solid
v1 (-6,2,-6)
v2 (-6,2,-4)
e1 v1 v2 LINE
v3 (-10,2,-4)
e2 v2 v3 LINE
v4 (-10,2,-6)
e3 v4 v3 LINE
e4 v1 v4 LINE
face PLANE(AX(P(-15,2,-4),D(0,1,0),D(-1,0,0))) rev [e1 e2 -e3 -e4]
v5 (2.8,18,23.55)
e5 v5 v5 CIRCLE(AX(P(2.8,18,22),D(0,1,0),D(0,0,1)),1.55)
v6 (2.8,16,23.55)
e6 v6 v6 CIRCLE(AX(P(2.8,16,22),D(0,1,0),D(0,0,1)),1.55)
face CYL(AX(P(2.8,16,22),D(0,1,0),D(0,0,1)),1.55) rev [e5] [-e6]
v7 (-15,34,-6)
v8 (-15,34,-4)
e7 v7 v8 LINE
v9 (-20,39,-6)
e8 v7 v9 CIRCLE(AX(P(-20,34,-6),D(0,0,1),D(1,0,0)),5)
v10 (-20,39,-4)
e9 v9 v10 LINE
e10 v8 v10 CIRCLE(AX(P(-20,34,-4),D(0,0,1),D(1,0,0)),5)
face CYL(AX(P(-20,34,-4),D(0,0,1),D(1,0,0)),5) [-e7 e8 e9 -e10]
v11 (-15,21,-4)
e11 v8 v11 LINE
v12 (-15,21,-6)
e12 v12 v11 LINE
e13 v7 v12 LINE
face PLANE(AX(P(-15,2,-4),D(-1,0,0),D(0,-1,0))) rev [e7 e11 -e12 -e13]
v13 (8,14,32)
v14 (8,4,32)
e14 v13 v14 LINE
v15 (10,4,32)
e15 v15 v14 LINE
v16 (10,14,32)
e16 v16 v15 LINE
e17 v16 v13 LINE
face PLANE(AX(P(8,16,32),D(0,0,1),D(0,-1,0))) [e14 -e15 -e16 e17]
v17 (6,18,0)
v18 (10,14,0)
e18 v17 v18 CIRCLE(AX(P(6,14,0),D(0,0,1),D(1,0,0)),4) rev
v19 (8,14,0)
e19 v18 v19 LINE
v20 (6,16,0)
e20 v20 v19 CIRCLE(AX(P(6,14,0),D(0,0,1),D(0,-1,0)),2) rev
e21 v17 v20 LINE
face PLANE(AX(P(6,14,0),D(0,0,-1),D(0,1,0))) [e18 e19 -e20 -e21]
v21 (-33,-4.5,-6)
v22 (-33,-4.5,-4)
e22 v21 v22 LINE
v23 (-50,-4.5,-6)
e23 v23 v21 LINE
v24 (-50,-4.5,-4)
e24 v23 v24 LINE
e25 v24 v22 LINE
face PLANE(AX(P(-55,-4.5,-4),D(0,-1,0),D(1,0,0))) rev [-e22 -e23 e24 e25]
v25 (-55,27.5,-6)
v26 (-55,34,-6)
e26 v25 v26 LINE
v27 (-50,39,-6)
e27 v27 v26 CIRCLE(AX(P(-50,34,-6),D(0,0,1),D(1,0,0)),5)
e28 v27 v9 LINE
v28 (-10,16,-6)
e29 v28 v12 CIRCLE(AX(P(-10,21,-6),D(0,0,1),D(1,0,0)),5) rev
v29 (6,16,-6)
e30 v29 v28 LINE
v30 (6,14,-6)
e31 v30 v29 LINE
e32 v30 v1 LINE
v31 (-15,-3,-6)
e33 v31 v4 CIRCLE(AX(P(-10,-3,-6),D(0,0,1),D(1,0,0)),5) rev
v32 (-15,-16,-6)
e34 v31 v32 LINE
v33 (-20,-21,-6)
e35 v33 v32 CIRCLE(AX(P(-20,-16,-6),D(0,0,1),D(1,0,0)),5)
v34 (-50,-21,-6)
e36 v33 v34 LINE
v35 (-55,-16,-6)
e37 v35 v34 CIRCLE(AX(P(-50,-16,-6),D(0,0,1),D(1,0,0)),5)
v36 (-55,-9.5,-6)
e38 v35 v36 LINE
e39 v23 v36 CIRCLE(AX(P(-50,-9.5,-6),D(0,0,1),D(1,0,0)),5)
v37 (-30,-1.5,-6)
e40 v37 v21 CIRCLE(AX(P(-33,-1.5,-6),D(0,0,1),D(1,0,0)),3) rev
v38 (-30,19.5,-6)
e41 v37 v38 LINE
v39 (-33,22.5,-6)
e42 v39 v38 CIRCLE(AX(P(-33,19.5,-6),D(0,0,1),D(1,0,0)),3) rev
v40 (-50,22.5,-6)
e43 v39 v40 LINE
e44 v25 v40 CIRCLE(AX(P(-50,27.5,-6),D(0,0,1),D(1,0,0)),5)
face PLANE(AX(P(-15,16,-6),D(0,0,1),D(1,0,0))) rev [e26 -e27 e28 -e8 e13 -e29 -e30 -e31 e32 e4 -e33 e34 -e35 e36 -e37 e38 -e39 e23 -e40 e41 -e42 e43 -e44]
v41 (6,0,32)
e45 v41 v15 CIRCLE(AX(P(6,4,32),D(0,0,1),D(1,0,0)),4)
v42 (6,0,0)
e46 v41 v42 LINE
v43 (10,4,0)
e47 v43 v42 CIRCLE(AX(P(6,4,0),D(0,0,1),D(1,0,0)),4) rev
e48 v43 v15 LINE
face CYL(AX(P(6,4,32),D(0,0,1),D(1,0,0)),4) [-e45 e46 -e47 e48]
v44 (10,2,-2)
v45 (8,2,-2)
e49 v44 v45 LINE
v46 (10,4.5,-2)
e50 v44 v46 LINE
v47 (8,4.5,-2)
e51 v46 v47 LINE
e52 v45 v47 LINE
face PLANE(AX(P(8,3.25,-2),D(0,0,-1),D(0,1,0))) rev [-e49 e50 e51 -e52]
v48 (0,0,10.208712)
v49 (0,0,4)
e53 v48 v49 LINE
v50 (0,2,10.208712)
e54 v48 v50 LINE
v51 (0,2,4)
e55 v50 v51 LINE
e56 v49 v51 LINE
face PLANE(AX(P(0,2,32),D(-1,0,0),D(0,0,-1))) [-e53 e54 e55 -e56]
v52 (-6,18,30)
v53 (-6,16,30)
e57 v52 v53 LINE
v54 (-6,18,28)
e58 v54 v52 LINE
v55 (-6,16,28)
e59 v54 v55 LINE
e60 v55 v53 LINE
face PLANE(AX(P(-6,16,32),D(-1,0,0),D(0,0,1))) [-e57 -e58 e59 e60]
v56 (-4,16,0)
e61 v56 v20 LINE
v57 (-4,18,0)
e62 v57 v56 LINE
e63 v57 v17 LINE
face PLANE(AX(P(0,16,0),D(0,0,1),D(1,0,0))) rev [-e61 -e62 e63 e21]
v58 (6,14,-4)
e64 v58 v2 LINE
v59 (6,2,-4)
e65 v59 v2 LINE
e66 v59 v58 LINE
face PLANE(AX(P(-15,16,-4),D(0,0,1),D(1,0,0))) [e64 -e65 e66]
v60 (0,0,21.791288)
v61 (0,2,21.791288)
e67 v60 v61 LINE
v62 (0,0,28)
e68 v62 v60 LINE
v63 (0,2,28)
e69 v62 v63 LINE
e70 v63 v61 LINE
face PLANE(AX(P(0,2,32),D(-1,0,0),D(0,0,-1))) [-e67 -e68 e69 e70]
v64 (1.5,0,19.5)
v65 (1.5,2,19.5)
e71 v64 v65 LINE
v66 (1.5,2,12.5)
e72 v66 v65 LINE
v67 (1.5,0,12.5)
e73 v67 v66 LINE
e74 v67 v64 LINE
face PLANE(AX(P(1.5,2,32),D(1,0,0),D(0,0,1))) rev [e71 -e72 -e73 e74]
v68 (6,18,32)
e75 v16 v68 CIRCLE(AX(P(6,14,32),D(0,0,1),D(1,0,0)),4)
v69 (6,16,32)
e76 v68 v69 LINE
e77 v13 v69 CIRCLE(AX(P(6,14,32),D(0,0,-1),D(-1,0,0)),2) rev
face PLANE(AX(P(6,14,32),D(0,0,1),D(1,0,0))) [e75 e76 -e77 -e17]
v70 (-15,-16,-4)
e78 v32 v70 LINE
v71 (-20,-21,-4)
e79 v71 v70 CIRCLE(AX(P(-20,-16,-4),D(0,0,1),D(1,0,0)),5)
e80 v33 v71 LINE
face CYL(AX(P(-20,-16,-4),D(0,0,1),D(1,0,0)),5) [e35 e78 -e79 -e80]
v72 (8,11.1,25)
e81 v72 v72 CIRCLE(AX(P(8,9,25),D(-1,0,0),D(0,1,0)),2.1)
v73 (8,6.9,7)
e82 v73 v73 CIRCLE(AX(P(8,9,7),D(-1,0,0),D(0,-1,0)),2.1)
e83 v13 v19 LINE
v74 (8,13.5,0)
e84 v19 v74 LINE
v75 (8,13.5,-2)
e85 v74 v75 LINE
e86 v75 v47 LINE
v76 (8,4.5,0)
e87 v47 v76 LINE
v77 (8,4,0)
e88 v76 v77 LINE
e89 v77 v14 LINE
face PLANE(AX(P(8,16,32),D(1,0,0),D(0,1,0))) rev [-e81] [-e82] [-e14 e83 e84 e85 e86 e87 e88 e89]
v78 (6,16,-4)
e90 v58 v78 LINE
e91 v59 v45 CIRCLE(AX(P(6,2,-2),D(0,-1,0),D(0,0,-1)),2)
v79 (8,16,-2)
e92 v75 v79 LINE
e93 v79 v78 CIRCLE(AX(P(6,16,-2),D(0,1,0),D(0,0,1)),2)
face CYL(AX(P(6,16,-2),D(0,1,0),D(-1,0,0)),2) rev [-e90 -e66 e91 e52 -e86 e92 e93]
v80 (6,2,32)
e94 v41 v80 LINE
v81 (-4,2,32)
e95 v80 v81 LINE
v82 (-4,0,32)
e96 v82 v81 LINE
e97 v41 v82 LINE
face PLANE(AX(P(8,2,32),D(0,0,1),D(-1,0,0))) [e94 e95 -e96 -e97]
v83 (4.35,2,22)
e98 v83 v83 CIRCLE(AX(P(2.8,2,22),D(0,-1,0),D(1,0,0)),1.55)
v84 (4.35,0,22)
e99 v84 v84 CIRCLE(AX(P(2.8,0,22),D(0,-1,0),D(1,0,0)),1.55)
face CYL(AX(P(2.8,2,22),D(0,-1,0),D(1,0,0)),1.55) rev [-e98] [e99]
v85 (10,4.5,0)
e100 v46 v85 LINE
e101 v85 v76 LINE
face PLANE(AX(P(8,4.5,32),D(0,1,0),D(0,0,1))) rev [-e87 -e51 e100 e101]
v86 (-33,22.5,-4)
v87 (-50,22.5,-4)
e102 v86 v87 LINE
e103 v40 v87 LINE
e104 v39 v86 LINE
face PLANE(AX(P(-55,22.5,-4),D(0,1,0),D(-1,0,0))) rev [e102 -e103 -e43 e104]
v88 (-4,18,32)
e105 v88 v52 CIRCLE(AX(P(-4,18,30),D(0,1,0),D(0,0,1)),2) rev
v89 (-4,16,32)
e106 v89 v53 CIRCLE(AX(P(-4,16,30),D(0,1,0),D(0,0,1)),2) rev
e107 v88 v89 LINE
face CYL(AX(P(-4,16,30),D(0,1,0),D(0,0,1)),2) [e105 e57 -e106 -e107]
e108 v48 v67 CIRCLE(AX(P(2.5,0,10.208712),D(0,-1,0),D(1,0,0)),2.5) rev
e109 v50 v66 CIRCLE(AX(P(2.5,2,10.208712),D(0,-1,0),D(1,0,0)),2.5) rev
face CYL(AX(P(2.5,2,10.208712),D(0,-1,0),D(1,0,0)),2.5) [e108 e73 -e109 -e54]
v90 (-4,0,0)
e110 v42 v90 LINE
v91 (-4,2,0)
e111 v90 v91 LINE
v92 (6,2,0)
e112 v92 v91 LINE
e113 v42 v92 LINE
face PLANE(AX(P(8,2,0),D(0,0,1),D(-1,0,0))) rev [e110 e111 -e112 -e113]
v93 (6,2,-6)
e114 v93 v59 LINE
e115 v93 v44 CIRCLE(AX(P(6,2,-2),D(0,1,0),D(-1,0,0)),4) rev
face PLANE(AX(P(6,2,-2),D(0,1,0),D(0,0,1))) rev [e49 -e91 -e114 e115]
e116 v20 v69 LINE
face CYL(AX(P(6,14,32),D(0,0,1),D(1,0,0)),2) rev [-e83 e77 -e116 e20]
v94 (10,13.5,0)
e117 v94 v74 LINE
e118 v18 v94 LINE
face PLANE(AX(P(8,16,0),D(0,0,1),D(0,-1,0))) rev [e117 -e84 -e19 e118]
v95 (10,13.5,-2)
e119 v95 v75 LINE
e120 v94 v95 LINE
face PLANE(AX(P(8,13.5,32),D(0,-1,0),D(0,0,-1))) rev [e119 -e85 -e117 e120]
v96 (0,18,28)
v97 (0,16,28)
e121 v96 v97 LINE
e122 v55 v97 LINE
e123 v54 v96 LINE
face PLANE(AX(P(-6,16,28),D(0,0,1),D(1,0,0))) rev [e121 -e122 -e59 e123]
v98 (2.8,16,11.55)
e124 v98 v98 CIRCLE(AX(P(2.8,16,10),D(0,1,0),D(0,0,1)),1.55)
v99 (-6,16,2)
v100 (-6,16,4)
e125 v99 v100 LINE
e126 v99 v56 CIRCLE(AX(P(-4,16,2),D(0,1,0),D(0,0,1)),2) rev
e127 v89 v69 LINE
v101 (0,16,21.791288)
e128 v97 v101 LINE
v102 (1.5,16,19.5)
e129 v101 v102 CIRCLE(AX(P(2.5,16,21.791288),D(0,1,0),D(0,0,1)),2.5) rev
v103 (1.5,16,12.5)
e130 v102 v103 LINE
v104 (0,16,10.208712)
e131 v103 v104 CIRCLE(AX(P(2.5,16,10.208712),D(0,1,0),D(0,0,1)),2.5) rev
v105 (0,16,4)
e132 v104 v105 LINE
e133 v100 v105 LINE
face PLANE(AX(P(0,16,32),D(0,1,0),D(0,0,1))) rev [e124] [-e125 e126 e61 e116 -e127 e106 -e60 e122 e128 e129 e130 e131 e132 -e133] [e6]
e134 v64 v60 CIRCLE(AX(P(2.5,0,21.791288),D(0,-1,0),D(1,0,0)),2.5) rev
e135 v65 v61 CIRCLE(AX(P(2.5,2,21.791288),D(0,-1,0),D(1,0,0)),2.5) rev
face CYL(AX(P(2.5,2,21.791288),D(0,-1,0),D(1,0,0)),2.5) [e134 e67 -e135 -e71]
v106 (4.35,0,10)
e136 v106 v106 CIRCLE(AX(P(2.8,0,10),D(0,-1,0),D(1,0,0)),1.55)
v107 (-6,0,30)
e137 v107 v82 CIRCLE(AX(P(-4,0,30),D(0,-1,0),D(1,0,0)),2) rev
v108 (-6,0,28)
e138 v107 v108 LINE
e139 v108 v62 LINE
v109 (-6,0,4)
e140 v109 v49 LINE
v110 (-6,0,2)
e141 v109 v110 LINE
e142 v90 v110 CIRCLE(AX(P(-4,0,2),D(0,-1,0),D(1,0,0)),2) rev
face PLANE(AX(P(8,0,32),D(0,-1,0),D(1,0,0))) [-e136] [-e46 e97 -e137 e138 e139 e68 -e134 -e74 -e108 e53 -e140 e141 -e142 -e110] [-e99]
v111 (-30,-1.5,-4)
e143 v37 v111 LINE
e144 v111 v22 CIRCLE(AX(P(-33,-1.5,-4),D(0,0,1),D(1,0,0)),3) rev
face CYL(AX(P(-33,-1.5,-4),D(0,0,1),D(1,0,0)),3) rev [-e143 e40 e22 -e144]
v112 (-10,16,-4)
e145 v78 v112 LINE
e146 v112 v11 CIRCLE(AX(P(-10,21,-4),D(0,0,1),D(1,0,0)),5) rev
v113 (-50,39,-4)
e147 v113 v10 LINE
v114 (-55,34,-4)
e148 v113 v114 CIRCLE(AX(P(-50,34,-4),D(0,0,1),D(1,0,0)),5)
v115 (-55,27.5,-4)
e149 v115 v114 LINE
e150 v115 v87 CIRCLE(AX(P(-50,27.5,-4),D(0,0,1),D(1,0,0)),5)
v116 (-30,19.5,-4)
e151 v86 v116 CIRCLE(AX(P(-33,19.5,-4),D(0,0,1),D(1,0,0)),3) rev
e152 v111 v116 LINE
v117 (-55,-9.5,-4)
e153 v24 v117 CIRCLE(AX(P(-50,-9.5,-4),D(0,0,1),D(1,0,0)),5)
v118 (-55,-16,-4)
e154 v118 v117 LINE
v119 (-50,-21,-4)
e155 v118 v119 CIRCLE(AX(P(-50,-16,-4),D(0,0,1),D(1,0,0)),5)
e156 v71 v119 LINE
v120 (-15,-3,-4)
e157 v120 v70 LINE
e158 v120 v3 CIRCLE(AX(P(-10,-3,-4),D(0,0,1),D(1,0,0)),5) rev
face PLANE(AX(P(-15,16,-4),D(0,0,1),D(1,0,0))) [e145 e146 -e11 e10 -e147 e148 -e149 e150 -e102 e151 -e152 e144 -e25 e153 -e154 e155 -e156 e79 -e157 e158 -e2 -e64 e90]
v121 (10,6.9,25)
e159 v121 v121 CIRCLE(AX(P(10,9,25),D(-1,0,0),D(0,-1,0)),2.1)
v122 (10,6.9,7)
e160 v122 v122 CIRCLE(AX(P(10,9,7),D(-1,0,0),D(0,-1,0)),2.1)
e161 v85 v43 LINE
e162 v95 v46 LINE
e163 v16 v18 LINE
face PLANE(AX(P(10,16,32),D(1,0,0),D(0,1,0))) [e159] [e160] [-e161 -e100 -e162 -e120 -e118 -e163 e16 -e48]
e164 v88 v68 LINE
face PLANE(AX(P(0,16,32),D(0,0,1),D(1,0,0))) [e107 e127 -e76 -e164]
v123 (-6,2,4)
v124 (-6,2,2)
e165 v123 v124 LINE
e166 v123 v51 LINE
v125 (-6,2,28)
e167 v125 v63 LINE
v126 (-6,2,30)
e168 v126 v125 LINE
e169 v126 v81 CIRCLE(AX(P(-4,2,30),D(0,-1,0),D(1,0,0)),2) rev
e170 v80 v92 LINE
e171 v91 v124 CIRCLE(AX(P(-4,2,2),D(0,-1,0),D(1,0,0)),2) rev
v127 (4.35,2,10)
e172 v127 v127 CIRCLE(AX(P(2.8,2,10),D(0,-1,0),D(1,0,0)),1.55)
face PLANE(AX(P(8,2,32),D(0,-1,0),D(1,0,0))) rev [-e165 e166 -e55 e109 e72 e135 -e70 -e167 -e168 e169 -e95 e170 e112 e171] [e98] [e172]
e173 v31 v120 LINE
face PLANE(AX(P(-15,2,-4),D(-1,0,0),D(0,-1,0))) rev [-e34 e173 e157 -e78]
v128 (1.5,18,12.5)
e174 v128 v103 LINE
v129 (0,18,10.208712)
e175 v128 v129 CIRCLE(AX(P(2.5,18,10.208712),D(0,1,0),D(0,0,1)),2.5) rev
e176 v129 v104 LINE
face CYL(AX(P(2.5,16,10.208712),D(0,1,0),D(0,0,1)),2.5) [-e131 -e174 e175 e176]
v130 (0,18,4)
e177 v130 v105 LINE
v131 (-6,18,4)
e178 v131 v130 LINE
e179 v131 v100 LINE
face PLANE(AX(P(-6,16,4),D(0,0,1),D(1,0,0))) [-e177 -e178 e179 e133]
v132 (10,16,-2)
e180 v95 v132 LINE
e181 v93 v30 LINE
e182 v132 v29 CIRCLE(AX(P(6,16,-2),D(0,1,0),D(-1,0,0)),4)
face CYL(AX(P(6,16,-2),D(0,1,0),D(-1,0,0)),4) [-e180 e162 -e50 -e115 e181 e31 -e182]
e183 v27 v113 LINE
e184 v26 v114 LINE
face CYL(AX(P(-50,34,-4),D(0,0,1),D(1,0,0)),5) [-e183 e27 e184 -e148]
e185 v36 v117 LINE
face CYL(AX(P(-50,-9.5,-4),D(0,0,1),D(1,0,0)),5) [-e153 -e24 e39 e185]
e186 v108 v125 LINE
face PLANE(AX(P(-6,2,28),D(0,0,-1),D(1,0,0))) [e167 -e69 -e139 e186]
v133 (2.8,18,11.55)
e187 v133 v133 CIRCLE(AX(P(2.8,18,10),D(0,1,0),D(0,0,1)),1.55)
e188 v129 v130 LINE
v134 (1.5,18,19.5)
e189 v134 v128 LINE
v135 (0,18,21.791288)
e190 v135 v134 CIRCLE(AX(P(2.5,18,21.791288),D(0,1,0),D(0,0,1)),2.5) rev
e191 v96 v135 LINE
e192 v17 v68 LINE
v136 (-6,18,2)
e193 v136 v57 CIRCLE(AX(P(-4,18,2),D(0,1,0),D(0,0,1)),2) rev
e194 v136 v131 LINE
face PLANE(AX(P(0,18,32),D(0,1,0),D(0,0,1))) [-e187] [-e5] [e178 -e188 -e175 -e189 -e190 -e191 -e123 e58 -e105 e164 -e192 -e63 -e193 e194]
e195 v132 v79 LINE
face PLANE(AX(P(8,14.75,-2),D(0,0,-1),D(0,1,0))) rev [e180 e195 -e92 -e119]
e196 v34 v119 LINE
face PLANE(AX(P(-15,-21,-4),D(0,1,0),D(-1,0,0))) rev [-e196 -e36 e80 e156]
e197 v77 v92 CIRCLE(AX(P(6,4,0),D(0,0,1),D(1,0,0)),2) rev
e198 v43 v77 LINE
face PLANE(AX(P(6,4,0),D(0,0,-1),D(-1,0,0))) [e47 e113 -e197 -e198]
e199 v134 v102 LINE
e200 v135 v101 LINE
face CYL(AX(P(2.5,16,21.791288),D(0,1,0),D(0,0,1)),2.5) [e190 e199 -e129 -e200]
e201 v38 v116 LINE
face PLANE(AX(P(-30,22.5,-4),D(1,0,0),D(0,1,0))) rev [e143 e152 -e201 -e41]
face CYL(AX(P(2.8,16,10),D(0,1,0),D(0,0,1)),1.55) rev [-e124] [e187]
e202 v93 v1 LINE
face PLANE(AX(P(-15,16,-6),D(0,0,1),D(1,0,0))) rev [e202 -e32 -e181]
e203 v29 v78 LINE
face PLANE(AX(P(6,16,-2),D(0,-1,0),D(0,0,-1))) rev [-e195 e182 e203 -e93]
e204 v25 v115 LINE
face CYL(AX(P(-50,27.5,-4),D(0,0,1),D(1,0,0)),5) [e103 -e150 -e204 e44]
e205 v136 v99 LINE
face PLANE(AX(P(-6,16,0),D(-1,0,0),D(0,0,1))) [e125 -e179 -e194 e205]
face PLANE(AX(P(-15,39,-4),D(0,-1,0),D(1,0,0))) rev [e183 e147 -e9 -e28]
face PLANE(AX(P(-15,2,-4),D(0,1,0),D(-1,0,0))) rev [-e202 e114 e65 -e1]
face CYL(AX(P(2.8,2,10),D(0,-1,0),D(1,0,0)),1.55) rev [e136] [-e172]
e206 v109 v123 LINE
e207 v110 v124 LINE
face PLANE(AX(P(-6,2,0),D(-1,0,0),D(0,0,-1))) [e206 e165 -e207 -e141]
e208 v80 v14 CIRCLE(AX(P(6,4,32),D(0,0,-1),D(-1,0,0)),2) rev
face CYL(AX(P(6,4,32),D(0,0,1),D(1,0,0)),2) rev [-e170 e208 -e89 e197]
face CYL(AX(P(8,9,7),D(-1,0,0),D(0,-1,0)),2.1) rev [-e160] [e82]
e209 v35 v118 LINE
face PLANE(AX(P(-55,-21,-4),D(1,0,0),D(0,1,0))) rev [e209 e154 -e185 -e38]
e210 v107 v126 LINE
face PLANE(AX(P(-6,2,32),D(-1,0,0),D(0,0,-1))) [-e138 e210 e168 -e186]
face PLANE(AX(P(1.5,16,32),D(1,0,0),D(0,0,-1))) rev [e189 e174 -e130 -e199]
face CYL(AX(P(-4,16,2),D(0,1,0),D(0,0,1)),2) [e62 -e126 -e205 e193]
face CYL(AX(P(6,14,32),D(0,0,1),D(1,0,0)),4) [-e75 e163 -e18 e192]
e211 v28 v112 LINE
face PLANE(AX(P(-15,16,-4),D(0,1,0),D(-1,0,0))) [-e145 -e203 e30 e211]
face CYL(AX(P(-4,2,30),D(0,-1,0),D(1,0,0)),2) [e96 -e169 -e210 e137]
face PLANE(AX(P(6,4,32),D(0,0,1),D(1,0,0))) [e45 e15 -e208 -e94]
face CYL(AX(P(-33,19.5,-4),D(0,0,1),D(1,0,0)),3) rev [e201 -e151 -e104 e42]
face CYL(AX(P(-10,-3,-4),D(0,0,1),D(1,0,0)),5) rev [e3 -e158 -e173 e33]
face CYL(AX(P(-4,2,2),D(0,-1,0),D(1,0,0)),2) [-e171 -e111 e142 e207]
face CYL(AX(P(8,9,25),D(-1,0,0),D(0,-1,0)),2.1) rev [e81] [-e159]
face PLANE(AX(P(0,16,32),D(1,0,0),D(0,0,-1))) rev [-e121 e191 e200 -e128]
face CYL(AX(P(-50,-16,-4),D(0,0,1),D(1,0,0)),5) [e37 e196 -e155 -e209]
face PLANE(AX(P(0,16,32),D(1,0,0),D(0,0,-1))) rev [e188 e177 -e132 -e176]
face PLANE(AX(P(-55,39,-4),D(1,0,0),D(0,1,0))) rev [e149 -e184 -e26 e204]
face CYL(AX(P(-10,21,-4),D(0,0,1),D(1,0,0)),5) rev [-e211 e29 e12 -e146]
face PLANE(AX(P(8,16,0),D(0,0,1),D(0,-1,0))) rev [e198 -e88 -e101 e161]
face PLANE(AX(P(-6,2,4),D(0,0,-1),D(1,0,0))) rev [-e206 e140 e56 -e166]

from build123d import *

# Parameters (mm, degrees)
BOSS_EXTRU_1_DEPTH        = 32
ESQUISSE2_R               = 1.55
ENL_V_MAT_EXTRU_1_DEPTH   = 39.052595181
ESQUISSE3_W               = 1.5
ESQUISSE3_H               = 7
ENL_V_MAT_EXTRU_2_DEPTH   = 39.052595181
ESQUISSE4_W               = 4
ESQUISSE4_H               = 2
BOSS_EXTRU_2_DEPTH        = 6
CONG_1_R                  = 2.5
CONG_2_R                  = 2
ESQUISSE13_R              = 2.1
ENL_V_MAT_EXTRU_3_DEPTH   = 40.293765409
ESQUISSE14_W              = 2
ESQUISSE14_H              = 14
BOSS_EXTRU_3_DEPTH        = 4
BOSS_EXTRU_4_START        = -14
ESQUISSE15_W              = 25
ESQUISSE15_H              = 2
BOSS_EXTRU_4_DEPTH        = 14
BOSS_EXTRU_5_START        = -2
BOSS_EXTRU_5_DEPTH        = 2
CONG_5_R                  = 5
CONG_6_R                  = 3
ESQUISSE26_W              = 2
ESQUISSE26_H              = 2.5
ENL_V_MAT_EXTRU_5_DEPTH   = 83.280009723
CONVERTIR_VOLUME3_DEPTH   = 32
CONVERTIR_VOLUME3_START   = 2
CONVERTIR_VOLUME3_2_DEPTH = 14
CONVERTIR_VOLUME3_3_DEPTH = 32
CONVERTIR_VOLUME3_START_2 = -6
CONVERTIR_VOLUME3_4_DEPTH = 2
CONVERTIR_VOLUME3_5_DEPTH = 14


# Read off the part's stored shape, not the designer's step: Convertir-Volume3
with BuildPart() as part:
    # Esquisse1 → Boss.-Extru.1 (new body)
    with BuildSketch(Plane.XY):
        Polygon((0, 0), (10, 0), (10, 18), (0, 18), (0, 16), (8, 16), (8, 2), (0, 2), align=None)
    extrude(amount=BOSS_EXTRU_1_DEPTH)

    # Esquisse2 → Enlèv. mat.-Extru.1 (cut, through all)
    with BuildSketch(Plane(origin=(0, 18, 0), x_dir=(1, 0, 0), z_dir=(0, 1, 0))):
        with Locations(Location((2.8, -10, 0), (0, 0, 270))):
            Circle(ESQUISSE2_R)
        with Locations((2.8, -22)):
            Circle(ESQUISSE2_R)
    extrude(amount=-ENL_V_MAT_EXTRU_1_DEPTH, mode=Mode.SUBTRACT)

    # Esquisse3 → Enlèv. mat.-Extru.2 (cut, through all)
    with BuildSketch(Plane(origin=(0, 18, 0), x_dir=(1, 0, 0), z_dir=(0, 1, 0))):
        with Locations((0.75, -16)):
            Rectangle(ESQUISSE3_W, ESQUISSE3_H)
    extrude(amount=-ENL_V_MAT_EXTRU_2_DEPTH, mode=Mode.SUBTRACT)

    # Esquisse4 → Boss.-Extru.2 (add)
    with BuildSketch(Plane.ZY):
        with Locations((2, 17)):
            Rectangle(ESQUISSE4_W, ESQUISSE4_H)
        with Locations((2, 1)):
            Rectangle(ESQUISSE4_W, ESQUISSE4_H)
        with Locations((30, 1)):
            Rectangle(ESQUISSE4_W, ESQUISSE4_H)
        with Locations((30, 17)):
            Rectangle(ESQUISSE4_W, ESQUISSE4_H)
    extrude(amount=BOSS_EXTRU_2_DEPTH)

    # Congé1
    # the kernel refuses this fillet: 2.5 mm, written as the material it takes off along each edge
    with BuildSketch(Plane(origin=(0, 7.728219619, 19.5), x_dir=(0, 0, 1), z_dir=(0, -1, 0)), Plane(origin=(0, 23.728219619, 19.5), x_dir=(0, 0, 1), z_dir=(0, -1, 0))) as cong_1_piece_1:
        with BuildLine():
            CenterArc((2.291287847, -2.5), CONG_1_R, 90, 66.421821522)
            Line((0, -1.5), (-0.045825757, -1.48))
            ThreePointArc((-0.045825757, -1.48), (-0.05, -0.75), (-0.05, 0))
            Line((-0.05, 0), (0, 0.05))
            Line((0, 0.05), (2.291287847, 0.05))
            Line((2.291287847, 0.05), (2.291287847, 0))
        make_face()
    extrude(amount=13.456439237, mode=Mode.SUBTRACT)
    with BuildSketch(Plane(origin=(0, 7.728219619, 12.5), x_dir=(1, 0, 0), z_dir=(0, -1, 0)), Plane(origin=(0, 23.728219619, 12.5), x_dir=(1, 0, 0), z_dir=(0, -1, 0))) as cong_1_piece_2:
        with BuildLine():
            CenterArc((2.5, -2.291287847), CONG_1_R, 113.578178478, 66.421821522)
            Line((0, -2.291287847), (-0.05, -2.291287847))
            Line((-0.05, -2.291287847), (-0.05, 0))
            Line((-0.05, 0), (0, 0.05))
            ThreePointArc((0, 0.05), (0.75, 0.05), (1.48, 0.045825757))
            Line((1.48, 0.045825757), (1.5, 0))
        make_face()
    extrude(amount=13.456439237, mode=Mode.SUBTRACT)

    # Congé2
    cong_2_edges = [part.edges().sort_by_distance(p)[0] for p in [
        (-6, 17, 32),
        (-6, 17, 0),
        (-6, 1, 0),
        (-6, 1, 32),
    ]]
    fillet(cong_2_edges, radius=CONG_2_R)

    # Esquisse13 → Enlèv. mat.-Extru.3 (cut, through all)
    with BuildSketch(Plane.ZY.offset(-8)):
        with Locations(Location((7, 9, 0), (0, 0, 270))):
            Circle(ESQUISSE13_R)
        with Locations(Location((25, 9, 0), (0, 0, 90))):
            Circle(ESQUISSE13_R)
    extrude(amount=-ENL_V_MAT_EXTRU_3_DEPTH, mode=Mode.SUBTRACT)

    # Esquisse14 → Boss.-Extru.3 (add)
    with BuildSketch(Plane(origin=(0, 0, 0), x_dir=(-1, 0, 0), z_dir=(0, 0, -1))):
        with Locations((-9, 9)):
            Rectangle(ESQUISSE14_W, ESQUISSE14_H)
    extrude(amount=BOSS_EXTRU_3_DEPTH)

    # Esquisse15 → Boss.-Extru.4 (add)
    with BuildSketch(Plane.XZ.offset(-2).offset(BOSS_EXTRU_4_START)):
        with Locations((-2.5, -5)):
            Rectangle(ESQUISSE15_W, ESQUISSE15_H)
    extrude(amount=BOSS_EXTRU_4_DEPTH)

    # Esquisse16 → Boss.-Extru.5 (add)
    with BuildSketch(Plane(origin=(0, 0, -6), x_dir=(-1, 0, 0), z_dir=(0, 0, -1)).offset(BOSS_EXTRU_5_START)):
        Polygon((15, 16), (15, 39), (55, 39), (55, 22.5), (30, 22.5), (30, -4.5), (55, -4.5), (55, -21), (15, -21), (15, 2), align=None)
    extrude(amount=BOSS_EXTRU_5_DEPTH)

    # Congé5
    cong_5_edges = [part.edges().sort_by_distance(p)[0] for p in [
        (-15, 16, -5),
        (-15, 2, -5),
        (-15, -21, -5),
        (-15, 39, -5),
        (-55, 39, -5),
        (-55, 22.5, -5),
        (-55, -4.5, -5),
        (-55, -21, -5),
    ]]
    fillet(cong_5_edges, radius=CONG_5_R)

    # Congé6
    cong_6_edges = [part.edges().sort_by_distance(p)[0] for p in [
        (-30, 22.5, -5),
        (-30, -4.5, -5),
    ]]
    fillet(cong_6_edges, radius=CONG_6_R)

    # Esquisse26 → Enlèv. mat.-Extru.5 (cut, through all)
    with BuildSketch(Plane(origin=(10, 0, 0), x_dir=(0, 0, -1), z_dir=(1, 0, 0))):
        with Locations((1, 3.25)):
            Rectangle(ESQUISSE26_W, ESQUISSE26_H)
        with Locations((1, 14.75)):
            Rectangle(ESQUISSE26_W, ESQUISSE26_H)
    extrude(amount=-ENL_V_MAT_EXTRU_5_DEPTH, mode=Mode.SUBTRACT)

    # Convertir-Volume3 outline → Convertir-Volume3 (add)
    with BuildSketch(Plane.XY):
        with BuildLine():
            ThreePointArc((6, 16), (7.414213562, 15.414213562), (8, 14))
            Line((8, 14), (8, 16))
            Line((8, 16), (6, 16))
        make_face()
        with BuildLine():
            Line((8, 2), (8, 4))
            ThreePointArc((8, 4), (7.414213562, 2.585786438), (6, 2))
            Line((6, 2), (8, 2))
        make_face()
    extrude(amount=CONVERTIR_VOLUME3_DEPTH)

    # Convertir-Volume3 2 outline → Convertir-Volume3 2 (add)
    with BuildSketch(Plane(origin=(0, 0, 0), x_dir=(1, 0, 0), z_dir=(0, 1, 0)).offset(CONVERTIR_VOLUME3_START)):
        with BuildLine():
            ThreePointArc((6, 4), (7.414213562, 3.414213562), (8, 2))
            Line((8, 2), (8, 4))
            Line((8, 4), (6, 4))
        make_face()
    extrude(amount=CONVERTIR_VOLUME3_2_DEPTH)

    # Convertir-Volume3 3 outline → Convertir-Volume3 3 (cut)
    with BuildSketch(Plane.XY):
        with BuildLine():
            Line((10, 14), (10, 18))
            Line((10, 18), (6, 18))
            ThreePointArc((6, 18), (8.828427125, 16.828427125), (10, 14))
        make_face()
        with BuildLine():
            Line((10, 0), (10, 4))
            ThreePointArc((10, 4), (8.828427125, 1.171572875), (6, 0))
            Line((6, 0), (10, 0))
        make_face()
    extrude(amount=CONVERTIR_VOLUME3_3_DEPTH, mode=Mode.SUBTRACT)

    # Convertir-Volume3 4 outline → Convertir-Volume3 4 (cut)
    with BuildSketch(Plane.XY.offset(CONVERTIR_VOLUME3_START_2)):
        with BuildLine():
            Line((10, 16), (9.464101616, 16))
            ThreePointArc((9.464101616, 16), (9.863703305, 15.03527618), (10, 14))
            Line((10, 14), (10, 16))
        make_face()
        with BuildLine():
            ThreePointArc((10, 4), (9.863703305, 2.96472382), (9.464101616, 2))
            Line((9.464101616, 2), (10, 2))
            Line((10, 2), (10, 4))
        make_face()
    extrude(amount=CONVERTIR_VOLUME3_4_DEPTH, mode=Mode.SUBTRACT)

    # Convertir-Volume3 5 outline → Convertir-Volume3 5 (cut)
    with BuildSketch(Plane(origin=(0, 0, 0), x_dir=(1, 0, 0), z_dir=(0, 1, 0)).offset(CONVERTIR_VOLUME3_START)):
        with BuildLine():
            ThreePointArc((6, 6), (8.828427125, 4.828427125), (10, 2))
            Line((10, 2), (10, 6))
            Line((10, 6), (6, 6))
        make_face()
    extrude(amount=CONVERTIR_VOLUME3_5_DEPTH, mode=Mode.SUBTRACT)


solid = part.part
